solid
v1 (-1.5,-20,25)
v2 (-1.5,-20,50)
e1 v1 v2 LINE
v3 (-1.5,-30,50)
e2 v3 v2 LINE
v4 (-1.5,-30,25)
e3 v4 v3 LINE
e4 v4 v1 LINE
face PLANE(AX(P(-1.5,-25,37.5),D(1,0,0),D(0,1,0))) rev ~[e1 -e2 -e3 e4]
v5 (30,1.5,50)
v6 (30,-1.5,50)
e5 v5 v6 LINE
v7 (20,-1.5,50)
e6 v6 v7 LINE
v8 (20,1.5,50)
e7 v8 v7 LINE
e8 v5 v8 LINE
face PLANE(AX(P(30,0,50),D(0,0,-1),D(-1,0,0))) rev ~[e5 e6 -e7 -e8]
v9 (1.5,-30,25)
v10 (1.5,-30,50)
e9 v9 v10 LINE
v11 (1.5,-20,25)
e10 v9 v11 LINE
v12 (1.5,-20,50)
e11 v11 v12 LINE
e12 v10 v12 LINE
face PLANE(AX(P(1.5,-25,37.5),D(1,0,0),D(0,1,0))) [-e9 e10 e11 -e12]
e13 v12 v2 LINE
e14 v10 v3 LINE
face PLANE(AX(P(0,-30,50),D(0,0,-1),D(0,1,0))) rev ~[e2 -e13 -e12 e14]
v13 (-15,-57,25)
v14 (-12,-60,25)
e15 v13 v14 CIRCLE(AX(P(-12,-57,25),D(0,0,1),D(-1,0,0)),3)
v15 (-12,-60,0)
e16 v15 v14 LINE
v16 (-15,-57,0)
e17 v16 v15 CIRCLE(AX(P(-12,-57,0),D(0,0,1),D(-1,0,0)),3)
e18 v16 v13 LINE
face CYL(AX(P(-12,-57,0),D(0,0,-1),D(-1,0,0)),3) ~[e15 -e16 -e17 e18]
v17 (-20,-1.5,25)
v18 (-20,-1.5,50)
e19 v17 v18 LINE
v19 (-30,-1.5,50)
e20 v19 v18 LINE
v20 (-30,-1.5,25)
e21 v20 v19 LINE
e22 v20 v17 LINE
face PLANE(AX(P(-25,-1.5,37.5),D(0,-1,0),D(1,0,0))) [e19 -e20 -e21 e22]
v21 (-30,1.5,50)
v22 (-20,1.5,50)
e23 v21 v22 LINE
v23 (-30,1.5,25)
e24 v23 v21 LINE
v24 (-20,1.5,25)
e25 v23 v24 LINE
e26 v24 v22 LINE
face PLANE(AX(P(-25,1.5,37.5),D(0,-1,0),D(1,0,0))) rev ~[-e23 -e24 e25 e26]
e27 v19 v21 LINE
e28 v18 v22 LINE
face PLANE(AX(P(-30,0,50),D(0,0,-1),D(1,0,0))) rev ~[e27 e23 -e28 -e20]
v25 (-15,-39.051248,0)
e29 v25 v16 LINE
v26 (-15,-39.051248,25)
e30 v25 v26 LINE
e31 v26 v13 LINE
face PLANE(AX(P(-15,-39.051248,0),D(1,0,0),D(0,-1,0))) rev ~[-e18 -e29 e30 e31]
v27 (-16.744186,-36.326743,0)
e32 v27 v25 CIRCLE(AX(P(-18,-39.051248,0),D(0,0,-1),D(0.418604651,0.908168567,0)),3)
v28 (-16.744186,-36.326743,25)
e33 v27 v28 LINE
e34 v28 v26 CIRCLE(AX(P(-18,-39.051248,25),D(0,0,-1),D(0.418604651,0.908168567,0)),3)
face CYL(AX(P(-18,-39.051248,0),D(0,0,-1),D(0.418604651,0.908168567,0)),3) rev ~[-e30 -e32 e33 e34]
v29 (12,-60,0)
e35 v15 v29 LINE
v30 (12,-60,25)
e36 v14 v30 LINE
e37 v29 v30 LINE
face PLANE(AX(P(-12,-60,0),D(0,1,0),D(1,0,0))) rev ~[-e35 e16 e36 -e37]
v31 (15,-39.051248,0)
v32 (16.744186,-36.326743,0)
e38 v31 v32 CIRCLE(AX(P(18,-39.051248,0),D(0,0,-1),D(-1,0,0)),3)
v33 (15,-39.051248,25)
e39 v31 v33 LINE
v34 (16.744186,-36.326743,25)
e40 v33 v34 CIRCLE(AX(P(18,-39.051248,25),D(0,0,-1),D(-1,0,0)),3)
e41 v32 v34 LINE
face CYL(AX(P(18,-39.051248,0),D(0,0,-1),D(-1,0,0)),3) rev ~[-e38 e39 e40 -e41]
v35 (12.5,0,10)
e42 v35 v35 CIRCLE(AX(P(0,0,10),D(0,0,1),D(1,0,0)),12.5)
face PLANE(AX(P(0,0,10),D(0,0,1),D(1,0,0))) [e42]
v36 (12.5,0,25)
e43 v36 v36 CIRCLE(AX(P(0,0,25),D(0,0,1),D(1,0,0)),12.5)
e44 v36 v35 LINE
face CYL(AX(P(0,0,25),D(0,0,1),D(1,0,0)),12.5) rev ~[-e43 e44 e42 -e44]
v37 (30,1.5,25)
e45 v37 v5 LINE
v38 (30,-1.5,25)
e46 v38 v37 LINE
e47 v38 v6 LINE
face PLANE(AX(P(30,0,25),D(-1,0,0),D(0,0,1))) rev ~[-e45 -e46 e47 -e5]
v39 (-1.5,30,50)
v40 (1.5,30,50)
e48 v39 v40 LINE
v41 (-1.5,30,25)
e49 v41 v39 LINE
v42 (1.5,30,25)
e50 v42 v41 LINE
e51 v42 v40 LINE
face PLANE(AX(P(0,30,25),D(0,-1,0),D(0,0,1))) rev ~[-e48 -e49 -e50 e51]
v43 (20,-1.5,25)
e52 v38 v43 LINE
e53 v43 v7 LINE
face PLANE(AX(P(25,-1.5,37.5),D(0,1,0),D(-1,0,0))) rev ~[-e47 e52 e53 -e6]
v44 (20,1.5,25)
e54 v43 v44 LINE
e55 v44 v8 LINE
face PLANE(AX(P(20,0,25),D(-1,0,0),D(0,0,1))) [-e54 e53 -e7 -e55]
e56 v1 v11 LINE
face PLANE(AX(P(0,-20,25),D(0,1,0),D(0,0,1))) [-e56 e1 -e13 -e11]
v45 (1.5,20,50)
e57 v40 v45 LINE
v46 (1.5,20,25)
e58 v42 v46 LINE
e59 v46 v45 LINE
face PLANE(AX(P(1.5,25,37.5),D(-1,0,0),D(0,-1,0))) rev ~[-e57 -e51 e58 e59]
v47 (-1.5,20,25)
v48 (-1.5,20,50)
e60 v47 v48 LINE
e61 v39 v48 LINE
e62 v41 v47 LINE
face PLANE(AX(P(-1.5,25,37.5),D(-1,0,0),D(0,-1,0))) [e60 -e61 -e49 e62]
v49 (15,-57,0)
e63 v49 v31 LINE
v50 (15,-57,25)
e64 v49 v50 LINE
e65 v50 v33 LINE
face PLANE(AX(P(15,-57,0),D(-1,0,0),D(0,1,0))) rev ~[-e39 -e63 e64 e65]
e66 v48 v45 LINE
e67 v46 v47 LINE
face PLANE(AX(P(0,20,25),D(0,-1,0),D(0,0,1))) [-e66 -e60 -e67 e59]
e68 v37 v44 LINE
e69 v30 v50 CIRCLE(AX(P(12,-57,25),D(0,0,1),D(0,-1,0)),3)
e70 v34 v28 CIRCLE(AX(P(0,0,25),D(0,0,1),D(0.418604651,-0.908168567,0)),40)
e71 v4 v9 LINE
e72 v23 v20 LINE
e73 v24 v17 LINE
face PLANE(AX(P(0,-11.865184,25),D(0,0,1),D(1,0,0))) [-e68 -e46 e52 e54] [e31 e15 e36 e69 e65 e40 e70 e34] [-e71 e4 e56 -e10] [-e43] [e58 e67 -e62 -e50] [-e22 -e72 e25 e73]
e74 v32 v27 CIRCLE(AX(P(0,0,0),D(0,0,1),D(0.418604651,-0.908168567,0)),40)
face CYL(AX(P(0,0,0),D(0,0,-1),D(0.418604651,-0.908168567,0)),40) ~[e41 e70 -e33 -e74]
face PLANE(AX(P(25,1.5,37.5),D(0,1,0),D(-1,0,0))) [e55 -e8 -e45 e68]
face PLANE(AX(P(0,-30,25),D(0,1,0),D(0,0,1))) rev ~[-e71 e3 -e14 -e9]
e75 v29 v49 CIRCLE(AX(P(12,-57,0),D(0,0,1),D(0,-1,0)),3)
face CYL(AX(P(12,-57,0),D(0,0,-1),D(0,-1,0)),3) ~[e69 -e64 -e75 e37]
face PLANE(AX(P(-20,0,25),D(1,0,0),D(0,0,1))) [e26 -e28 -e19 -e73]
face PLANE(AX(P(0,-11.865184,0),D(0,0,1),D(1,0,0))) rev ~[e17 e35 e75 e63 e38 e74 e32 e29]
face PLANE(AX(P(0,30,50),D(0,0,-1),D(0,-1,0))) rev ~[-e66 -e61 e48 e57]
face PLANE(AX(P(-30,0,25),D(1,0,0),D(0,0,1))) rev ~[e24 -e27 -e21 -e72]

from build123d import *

# Parameters (mm, degrees)
F1_DEPTH        = 25
F2_R            = 12.5
F3_DEPTH        = 15
F4_W            = 10
F4_H            = 25
F5_DEPTH        = 1.5
F5_COPIES_COUNT = 4


# Not quite as in the source:
# - a pattern or mirror of a feature is missing from the dataset's text; its kind, count and spacing are read off the source's solid


with BuildPart() as f1:
    # F0 (on Top) → F1 (new body)
    with BuildSketch(Plane.XY):
        with BuildLine():
            ThreePointArc((15, -39.0512483795), (15.4733973541, -37.4337567815), (16.7441860465, -36.3267426786))
            ThreePointArc((16.7441860465, -36.3267426786), (0, 40), (-16.7441860465, -36.3267426786))
            ThreePointArc((-16.7441860465, -36.3267426786), (-15.4733973541, -37.4337567815), (-15, -39.0512483795))
            Line((-15, -39.0512483795), (-15, -57))
            ThreePointArc((-15, -57), (-14.1213203436, -59.1213203436), (-12, -60))
            Line((-12, -60), (12, -60))
            ThreePointArc((12, -60), (14.1213203436, -59.1213203436), (15, -57))
            Line((15, -57), (15, -39.0512483795))
        make_face()
    extrude(amount=F1_DEPTH)

    # F2 (on face) → F3 (cut)
    with BuildSketch(Plane.XY.offset(25)):
        Circle(F2_R)
    extrude(amount=-F3_DEPTH, mode=Mode.SUBTRACT)

    # F4 (on Right) → F5 (join, symmetric)
    with BuildSketch(Plane.YZ):
        with Locations((-25, 37.5)):
            Rectangle(F4_W, F4_H)
    f5 = extrude(amount=F5_DEPTH, both=True)

    # F5_copies: F5 ×4 about axis
    f5_copies_axis = Axis((0, 0, 0), (0, 0, 1))
    for i in range(1, F5_COPIES_COUNT):
        add(f5.rotate(f5_copies_axis, i * 360 / F5_COPIES_COUNT))


solid = f1.part
